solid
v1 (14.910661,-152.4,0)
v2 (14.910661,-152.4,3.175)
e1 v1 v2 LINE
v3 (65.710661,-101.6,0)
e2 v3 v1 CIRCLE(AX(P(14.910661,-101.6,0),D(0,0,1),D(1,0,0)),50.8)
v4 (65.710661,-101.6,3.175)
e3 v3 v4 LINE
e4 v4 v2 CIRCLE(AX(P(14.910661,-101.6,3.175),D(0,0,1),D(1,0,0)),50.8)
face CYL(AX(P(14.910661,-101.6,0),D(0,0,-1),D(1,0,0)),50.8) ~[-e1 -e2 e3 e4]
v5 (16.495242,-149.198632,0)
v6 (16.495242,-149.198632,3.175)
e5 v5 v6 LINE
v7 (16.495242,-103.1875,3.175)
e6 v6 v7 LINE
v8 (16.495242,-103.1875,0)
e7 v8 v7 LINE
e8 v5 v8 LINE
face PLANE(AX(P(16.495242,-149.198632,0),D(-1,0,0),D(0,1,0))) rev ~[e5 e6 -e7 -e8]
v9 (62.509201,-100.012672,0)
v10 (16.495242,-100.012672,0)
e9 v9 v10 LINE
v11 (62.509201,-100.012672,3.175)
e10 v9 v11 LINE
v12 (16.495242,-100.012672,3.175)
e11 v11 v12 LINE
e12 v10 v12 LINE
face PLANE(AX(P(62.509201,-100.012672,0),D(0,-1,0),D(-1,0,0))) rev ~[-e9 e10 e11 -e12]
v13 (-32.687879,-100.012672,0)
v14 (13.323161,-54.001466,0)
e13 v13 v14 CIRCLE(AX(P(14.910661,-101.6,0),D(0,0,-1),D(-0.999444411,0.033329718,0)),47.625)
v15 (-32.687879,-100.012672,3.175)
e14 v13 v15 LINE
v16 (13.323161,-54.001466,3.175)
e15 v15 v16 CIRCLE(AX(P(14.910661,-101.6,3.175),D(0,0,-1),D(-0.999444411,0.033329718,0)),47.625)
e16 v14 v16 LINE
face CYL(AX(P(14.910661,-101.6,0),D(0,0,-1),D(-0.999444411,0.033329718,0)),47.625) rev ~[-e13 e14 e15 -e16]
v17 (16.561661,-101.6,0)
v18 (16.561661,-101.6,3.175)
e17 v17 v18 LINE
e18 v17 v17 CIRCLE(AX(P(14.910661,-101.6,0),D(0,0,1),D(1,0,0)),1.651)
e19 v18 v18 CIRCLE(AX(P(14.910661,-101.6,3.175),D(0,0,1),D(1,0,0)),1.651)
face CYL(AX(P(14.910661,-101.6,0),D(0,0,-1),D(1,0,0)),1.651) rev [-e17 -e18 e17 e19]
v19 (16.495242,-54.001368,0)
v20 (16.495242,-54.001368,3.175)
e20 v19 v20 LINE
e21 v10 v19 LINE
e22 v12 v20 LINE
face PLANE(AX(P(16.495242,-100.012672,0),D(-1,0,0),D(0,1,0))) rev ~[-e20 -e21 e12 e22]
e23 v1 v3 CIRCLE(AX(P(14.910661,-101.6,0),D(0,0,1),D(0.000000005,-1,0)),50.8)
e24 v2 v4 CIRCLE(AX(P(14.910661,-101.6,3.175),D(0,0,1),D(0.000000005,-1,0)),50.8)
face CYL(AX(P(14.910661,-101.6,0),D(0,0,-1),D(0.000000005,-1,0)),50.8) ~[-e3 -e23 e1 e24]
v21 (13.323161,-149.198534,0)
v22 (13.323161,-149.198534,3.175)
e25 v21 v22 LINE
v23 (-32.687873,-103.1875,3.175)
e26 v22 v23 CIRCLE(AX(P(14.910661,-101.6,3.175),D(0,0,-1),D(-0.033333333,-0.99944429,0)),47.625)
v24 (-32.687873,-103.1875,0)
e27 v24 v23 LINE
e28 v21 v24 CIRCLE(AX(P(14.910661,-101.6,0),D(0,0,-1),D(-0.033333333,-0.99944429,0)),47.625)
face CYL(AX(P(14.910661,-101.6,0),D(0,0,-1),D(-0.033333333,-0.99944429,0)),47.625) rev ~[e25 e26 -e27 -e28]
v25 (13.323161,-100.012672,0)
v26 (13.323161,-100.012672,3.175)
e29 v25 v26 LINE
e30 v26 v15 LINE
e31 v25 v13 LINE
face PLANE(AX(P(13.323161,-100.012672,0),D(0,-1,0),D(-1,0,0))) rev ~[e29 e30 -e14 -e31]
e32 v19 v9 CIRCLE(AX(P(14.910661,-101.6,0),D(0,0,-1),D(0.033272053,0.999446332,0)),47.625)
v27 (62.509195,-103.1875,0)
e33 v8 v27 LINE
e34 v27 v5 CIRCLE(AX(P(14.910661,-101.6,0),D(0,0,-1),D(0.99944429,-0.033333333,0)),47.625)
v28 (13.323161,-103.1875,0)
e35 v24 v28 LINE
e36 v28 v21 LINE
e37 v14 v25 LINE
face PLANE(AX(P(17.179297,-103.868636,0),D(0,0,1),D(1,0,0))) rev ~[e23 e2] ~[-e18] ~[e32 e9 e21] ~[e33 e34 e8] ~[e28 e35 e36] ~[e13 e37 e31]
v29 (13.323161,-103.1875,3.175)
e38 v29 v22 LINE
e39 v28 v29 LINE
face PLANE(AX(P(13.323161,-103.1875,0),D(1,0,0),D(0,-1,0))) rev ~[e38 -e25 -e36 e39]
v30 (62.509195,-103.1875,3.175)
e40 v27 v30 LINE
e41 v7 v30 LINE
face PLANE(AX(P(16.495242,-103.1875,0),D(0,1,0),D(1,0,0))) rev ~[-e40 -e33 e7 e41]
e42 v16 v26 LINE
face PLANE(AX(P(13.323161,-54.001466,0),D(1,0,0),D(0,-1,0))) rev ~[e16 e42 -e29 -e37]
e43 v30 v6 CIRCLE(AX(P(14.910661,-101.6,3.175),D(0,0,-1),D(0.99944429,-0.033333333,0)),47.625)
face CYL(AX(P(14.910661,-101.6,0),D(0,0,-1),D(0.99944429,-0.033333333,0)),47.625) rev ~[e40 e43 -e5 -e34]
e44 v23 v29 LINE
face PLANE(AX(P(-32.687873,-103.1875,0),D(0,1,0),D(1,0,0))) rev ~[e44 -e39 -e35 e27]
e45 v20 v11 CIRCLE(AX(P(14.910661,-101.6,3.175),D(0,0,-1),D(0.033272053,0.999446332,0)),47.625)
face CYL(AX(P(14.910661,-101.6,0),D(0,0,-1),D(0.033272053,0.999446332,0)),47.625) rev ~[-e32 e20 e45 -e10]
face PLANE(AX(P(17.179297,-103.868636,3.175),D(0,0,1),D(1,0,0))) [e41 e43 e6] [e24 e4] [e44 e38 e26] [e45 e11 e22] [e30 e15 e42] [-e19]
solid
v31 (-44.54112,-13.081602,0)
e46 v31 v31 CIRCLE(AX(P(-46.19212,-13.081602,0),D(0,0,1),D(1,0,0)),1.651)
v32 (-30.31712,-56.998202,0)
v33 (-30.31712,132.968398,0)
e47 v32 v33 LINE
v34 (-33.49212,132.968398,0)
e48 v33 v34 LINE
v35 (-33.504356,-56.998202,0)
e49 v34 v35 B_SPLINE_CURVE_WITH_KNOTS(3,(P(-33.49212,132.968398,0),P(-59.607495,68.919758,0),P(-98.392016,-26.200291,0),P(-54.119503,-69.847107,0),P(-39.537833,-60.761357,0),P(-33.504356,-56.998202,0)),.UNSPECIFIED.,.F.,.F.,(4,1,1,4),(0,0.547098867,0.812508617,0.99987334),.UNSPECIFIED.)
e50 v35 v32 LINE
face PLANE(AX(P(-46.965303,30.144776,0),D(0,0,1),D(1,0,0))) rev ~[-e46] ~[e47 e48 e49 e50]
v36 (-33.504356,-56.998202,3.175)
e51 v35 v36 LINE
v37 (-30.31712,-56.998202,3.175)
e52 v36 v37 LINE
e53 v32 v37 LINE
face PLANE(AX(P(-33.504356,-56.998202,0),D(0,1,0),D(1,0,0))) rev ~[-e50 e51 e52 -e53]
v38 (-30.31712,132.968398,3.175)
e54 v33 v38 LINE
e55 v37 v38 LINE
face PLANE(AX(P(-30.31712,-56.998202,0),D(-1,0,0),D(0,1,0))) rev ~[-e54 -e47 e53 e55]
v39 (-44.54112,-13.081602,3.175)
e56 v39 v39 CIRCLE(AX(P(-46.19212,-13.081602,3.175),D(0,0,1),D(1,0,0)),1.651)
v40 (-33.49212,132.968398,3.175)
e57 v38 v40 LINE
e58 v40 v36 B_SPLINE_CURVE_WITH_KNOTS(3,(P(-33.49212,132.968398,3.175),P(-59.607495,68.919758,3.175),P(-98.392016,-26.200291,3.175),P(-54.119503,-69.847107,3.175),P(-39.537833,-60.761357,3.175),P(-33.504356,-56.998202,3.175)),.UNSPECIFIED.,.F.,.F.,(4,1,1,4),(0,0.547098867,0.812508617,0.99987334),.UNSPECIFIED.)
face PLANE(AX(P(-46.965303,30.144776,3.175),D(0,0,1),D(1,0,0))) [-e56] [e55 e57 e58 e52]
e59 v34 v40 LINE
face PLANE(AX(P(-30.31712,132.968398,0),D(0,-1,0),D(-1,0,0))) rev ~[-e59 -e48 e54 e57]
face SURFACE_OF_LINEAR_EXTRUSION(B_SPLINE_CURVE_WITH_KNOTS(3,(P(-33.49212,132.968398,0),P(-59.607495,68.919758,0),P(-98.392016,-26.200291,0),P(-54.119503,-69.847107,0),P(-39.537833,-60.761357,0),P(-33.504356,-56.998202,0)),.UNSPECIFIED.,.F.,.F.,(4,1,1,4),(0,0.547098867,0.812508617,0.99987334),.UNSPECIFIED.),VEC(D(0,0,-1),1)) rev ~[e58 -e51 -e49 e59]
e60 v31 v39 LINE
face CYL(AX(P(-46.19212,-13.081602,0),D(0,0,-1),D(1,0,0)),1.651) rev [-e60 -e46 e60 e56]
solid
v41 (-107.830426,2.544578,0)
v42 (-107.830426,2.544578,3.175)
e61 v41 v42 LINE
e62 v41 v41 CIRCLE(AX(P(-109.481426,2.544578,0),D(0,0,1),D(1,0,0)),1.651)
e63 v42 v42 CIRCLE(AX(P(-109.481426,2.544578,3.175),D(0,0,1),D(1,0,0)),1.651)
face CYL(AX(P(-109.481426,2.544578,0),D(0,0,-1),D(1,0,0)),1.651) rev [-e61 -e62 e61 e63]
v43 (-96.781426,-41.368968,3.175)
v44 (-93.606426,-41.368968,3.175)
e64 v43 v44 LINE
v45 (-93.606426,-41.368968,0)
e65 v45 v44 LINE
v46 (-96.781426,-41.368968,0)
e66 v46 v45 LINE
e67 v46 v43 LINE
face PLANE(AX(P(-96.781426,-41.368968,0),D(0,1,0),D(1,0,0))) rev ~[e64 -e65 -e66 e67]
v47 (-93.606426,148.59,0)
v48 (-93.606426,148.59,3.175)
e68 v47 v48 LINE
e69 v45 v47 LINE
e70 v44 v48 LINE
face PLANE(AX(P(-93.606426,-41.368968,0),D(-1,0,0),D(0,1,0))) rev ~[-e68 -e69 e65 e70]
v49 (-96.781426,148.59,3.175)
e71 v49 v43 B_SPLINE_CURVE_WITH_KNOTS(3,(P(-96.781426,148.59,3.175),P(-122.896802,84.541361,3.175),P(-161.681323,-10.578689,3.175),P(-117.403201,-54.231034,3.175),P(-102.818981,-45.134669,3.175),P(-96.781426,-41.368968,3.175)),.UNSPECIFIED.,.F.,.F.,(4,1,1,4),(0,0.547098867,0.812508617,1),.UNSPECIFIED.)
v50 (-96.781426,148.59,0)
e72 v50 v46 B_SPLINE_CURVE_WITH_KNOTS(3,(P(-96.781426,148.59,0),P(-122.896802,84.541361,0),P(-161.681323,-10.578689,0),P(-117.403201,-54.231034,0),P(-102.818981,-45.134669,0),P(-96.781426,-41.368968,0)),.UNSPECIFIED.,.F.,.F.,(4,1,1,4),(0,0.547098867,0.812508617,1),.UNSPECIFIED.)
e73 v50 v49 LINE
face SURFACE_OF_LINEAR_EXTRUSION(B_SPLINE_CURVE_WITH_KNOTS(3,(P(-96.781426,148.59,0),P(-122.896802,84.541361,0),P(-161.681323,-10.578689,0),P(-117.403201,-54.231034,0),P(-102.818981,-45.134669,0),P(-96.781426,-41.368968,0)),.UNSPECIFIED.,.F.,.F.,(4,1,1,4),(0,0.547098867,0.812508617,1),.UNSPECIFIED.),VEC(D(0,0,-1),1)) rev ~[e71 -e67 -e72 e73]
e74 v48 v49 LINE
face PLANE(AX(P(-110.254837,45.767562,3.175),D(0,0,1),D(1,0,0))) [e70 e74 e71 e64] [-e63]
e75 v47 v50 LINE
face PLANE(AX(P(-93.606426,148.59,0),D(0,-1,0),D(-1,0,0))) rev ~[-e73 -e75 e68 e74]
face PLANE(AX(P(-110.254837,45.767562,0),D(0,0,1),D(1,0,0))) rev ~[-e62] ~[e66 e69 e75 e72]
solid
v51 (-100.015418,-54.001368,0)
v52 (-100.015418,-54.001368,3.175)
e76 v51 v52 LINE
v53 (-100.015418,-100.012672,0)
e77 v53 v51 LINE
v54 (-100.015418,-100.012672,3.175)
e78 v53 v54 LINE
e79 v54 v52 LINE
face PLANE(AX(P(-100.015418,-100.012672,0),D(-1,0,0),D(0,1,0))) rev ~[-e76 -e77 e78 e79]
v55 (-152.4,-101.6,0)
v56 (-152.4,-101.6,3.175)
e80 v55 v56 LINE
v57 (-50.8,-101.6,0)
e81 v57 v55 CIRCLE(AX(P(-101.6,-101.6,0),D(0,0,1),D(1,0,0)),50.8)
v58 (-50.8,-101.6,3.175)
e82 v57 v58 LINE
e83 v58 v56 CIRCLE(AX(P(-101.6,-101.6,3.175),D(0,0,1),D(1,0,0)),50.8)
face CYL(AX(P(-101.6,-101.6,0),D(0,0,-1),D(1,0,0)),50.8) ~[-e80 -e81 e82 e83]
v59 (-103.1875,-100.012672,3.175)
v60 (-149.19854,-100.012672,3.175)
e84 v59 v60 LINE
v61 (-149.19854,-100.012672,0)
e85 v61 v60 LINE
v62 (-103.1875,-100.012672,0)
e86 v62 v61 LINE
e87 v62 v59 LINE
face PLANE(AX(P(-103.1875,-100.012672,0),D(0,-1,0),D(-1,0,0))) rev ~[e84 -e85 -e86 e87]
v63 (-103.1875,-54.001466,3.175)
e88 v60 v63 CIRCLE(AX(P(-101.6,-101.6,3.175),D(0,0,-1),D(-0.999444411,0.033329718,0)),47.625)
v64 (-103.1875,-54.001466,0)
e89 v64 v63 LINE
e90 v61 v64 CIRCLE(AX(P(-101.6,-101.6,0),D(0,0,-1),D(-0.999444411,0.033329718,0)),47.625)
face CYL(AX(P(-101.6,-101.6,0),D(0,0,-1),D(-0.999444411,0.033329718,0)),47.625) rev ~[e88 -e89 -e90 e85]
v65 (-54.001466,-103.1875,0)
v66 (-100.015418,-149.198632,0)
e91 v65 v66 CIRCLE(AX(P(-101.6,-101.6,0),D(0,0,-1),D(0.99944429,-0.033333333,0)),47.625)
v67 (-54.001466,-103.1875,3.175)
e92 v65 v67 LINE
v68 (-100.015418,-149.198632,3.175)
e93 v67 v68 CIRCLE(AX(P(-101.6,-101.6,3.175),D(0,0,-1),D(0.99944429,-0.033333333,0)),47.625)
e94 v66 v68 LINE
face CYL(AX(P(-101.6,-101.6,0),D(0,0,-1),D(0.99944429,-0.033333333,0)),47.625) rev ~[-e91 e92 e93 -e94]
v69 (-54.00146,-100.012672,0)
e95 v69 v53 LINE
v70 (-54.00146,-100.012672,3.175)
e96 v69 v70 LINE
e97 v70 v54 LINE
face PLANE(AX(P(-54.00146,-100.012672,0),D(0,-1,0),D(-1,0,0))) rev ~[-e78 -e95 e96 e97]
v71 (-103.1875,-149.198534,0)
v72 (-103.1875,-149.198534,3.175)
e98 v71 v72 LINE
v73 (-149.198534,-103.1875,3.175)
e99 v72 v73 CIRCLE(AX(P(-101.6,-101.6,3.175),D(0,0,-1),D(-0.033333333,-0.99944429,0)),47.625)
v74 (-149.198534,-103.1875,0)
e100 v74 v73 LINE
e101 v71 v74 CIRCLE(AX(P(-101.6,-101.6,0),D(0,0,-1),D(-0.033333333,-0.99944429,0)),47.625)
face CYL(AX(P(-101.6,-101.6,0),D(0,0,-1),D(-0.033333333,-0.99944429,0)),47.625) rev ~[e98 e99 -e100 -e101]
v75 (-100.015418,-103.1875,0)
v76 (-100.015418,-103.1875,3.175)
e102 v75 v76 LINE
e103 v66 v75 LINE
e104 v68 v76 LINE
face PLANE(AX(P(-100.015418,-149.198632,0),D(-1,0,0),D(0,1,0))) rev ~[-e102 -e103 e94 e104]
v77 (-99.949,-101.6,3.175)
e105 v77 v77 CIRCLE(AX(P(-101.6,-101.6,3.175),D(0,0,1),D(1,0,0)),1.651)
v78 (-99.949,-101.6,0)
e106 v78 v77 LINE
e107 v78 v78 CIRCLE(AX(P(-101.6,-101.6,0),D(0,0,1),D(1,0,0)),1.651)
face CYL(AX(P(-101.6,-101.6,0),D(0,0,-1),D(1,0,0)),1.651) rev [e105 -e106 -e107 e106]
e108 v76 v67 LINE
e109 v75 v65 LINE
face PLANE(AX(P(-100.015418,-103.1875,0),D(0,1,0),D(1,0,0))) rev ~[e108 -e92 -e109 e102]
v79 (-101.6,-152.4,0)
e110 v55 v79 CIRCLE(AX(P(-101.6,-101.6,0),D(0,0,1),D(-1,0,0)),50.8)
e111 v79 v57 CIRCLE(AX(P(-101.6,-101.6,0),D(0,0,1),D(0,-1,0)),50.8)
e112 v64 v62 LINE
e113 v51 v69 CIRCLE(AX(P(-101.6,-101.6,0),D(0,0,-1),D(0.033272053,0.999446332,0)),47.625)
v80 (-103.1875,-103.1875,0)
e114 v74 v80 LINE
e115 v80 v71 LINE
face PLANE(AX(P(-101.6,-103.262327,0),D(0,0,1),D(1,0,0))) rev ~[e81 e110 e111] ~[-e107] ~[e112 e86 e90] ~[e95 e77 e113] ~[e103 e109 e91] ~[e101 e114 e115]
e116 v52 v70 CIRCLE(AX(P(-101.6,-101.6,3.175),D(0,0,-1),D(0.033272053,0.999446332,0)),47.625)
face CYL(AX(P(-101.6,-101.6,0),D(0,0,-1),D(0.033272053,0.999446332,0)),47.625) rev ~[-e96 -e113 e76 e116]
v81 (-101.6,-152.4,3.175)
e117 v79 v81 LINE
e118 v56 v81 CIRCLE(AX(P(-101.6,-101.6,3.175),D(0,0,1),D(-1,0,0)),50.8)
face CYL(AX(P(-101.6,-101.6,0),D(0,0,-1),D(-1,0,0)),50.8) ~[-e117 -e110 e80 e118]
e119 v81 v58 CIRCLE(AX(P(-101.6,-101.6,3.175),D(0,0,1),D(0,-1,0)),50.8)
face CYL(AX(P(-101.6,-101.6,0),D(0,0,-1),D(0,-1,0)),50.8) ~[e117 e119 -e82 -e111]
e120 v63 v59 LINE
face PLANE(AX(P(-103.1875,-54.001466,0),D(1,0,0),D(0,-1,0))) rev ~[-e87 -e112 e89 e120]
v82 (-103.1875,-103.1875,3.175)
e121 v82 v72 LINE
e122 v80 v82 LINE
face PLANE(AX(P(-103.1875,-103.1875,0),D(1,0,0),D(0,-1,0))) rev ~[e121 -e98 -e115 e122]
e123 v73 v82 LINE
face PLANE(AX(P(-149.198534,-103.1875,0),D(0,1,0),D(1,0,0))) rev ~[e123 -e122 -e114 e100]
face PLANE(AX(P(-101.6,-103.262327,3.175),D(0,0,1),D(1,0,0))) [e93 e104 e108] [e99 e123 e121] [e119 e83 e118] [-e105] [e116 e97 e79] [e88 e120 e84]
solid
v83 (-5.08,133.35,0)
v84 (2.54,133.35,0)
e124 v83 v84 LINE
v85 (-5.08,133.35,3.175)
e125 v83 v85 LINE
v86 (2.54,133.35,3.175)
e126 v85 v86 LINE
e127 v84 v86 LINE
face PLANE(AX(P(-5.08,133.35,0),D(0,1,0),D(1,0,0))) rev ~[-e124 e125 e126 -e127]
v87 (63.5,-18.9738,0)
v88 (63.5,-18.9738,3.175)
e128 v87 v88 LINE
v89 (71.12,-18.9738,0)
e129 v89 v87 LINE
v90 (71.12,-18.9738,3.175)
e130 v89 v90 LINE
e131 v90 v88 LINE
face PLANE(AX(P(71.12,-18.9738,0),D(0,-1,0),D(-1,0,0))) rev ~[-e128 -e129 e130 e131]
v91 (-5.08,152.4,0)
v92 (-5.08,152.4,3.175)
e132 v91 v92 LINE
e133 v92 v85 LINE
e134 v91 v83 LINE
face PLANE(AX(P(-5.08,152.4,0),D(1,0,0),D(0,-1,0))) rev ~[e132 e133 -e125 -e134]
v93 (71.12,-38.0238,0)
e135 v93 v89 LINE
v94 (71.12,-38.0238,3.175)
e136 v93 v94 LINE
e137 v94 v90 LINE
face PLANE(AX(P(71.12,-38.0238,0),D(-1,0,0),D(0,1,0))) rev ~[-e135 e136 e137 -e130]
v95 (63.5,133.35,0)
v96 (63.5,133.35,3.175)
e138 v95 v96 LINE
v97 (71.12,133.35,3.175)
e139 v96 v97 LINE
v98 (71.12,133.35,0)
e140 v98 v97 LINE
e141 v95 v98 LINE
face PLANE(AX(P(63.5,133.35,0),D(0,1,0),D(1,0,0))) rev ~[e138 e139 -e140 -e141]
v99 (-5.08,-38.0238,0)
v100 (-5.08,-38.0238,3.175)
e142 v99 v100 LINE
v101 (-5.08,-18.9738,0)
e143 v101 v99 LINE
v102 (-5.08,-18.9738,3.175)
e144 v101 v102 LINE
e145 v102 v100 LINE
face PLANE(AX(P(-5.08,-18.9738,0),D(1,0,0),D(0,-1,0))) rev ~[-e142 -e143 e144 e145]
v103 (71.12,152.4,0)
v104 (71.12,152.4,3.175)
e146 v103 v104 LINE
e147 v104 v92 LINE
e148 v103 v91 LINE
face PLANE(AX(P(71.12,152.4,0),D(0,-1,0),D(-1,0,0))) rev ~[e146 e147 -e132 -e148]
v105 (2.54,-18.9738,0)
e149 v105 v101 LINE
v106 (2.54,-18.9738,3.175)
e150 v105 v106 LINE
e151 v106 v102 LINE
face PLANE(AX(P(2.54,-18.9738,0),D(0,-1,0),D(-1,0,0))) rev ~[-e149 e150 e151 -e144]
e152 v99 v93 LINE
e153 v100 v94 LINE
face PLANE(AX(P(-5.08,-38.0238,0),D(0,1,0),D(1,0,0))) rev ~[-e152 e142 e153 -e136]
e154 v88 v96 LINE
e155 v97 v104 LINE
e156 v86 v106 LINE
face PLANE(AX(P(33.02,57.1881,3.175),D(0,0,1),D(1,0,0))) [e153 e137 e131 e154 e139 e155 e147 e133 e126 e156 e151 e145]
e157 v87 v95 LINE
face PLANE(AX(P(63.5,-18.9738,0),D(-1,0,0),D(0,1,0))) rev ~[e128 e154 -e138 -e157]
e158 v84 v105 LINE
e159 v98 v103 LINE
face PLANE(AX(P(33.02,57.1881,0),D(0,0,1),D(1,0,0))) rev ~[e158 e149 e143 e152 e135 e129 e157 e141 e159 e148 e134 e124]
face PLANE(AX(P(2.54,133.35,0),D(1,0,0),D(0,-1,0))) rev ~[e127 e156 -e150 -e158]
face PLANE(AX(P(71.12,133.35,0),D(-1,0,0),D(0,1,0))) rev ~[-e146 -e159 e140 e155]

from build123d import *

# Parameters (mm, degrees)
F0_R     = 1.651
F1_DEPTH = 3.175


# Not quite as in the source:
# - a feature names something its author has since deleted; it is built from what else it names


with BuildPart() as f1:
    # F0 (on Top) → F1 (new body)
    with BuildSketch(Plane.XY):
        with BuildLine():
            ThreePointArc((65.7106608197, -101.6), (-21.0103637537, -65.6789756049), (14.9106610719, -152.4))
            ThreePointArc((14.9106610719, -152.4), (50.8316853932, -137.5210243951), (65.7106608197, -101.6))
        make_face()
        with BuildLine():
            Line((-32.6878734933, -103.1875), (13.3231608197, -103.1875))
            Line((13.3231608197, -103.1875), (13.3231608197, -149.198534313))
            ThreePointArc((13.3231608197, -149.198534313), (-18.7652996343, -135.275960454), (-32.6878734933, -103.1875))
        make_face(mode=Mode.SUBTRACT)
        with BuildLine():
            Line((13.3231608197, -54.001465687), (13.3231608197, -100.0126722037))
            Line((13.3231608197, -100.0126722037), (-32.6878792363, -100.0126722037))
            ThreePointArc((-32.6878792363, -100.0126722037), (-18.7653605513, -67.9241004631), (13.3231608197, -54.001465687))
        make_face(mode=Mode.SUBTRACT)
        with BuildLine():
            ThreePointArc((62.5091951328, -103.1875), (48.5855888423, -135.2769928537), (16.4952423273, -149.1986315606))
            Line((16.4952423273, -149.1986315606), (16.4952423273, -103.1875))
            Line((16.4952423273, -103.1875), (62.5091951328, -103.1875))
        make_face(mode=Mode.SUBTRACT)
        with Locations((14.9106608197, -101.6)):
            Circle(F0_R, mode=Mode.SUBTRACT)
        with BuildLine():
            Line((16.4952423273, -100.0126722037), (16.4952423273, -54.0013684394))
            ThreePointArc((16.4952423273, -54.0013684394), (48.5856497612, -67.9230680615), (62.5092008758, -100.0126722037))
            Line((62.5092008758, -100.0126722037), (16.4952423273, -100.0126722037))
        make_face(mode=Mode.SUBTRACT)
    extrude(amount=F1_DEPTH)


with BuildPart() as f1b:
    # F0 (on Top) → F1, piece 2 (new body)
    with BuildSketch(Plane.XY):
        with BuildLine():
            ThreePointArc((-152.4, -101.6), (-137.5210244843, -137.5210244843), (-101.6, -152.4))
            ThreePointArc((-101.6, -152.4), (-65.6789755157, -137.5210244843), (-50.8, -101.6))
            ThreePointArc((-50.8, -101.6), (-101.6, -50.8), (-152.4, -101.6))
        make_face()
        with BuildLine():
            Line((-149.198534313, -103.1875), (-103.1875, -103.1875))
            Line((-103.1875, -103.1875), (-103.1875, -149.198534313))
            ThreePointArc((-103.1875, -149.198534313), (-135.275960454, -135.275960454), (-149.198534313, -103.1875))
        make_face(mode=Mode.SUBTRACT)
        with BuildLine():
            Line((-103.1875, -54.001465687), (-103.1875, -100.0126722037))
            Line((-103.1875, -100.0126722037), (-149.198540056, -100.0126722037))
            ThreePointArc((-149.198540056, -100.0126722037), (-135.276021371, -67.9241004631), (-103.1875, -54.001465687))
        make_face(mode=Mode.SUBTRACT)
        with Locations((-101.6, -101.6)):
            Circle(F0_R, mode=Mode.SUBTRACT)
        with BuildLine():
            ThreePointArc((-54.001465687, -103.1875), (-67.9250719774, -135.2769928537), (-100.0154184924, -149.1986315606))
            Line((-100.0154184924, -149.1986315606), (-100.0154184924, -103.1875))
            Line((-100.0154184924, -103.1875), (-54.001465687, -103.1875))
        make_face(mode=Mode.SUBTRACT)
        with BuildLine():
            Line((-100.0154184924, -100.0126722037), (-100.0154184924, -54.0013684394))
            ThreePointArc((-100.0154184924, -54.0013684394), (-67.9250110585, -67.9230680615), (-54.001459944, -100.0126722037))
            Line((-54.001459944, -100.0126722037), (-100.0154184924, -100.0126722037))
        make_face(mode=Mode.SUBTRACT)
    extrude(amount=F1_DEPTH)


with BuildPart() as f1c:
    # F0 (on Top) → F1, piece 3 (new body)
    with BuildSketch(Plane.XY):
        Polygon((71.12, 133.35), (71.12, 152.4), (-5.08, 152.4), (-5.08, 133.35), (2.54, 133.35), (2.54, -18.9738), (-5.08, -18.9738), (-5.08, -38.0238), (71.12, -38.0238), (71.12, -18.9738), (63.5, -18.9738), (63.5, 133.35), align=None)
    extrude(amount=F1_DEPTH)


with BuildPart() as f1d:
    # F0 (on Top) → F1, piece 4 (new body)
    with BuildSketch(Plane.XY):
        with BuildLine():
            Line((-93.6064264297, 148.5900000185), (-96.7814264297, 148.5900000185))
            add(Edge.make_bspline(
                [(-96.7814264297, 148.5900000185), (-122.8968017051, 84.5413605912), (-161.6813226062, -10.5786891249), (-117.4032009161, -54.2310342357), (-102.8189814093, -45.1346689408), (-96.7814264297, -41.3689682424)],
                knots=[0, 0, 0, 0, 0.5470988668, 0.8125086166, 1, 1, 1, 1], degree=3))
            Line((-96.7814264297, -41.3689682424), (-93.6064264297, -41.3689682424))
            Line((-93.6064264297, -41.3689682424), (-93.6064264297, 148.5900000185))
        make_face()
        with Locations((-109.4814264297, 2.5445778297)):
            Circle(F0_R, mode=Mode.SUBTRACT)
    extrude(amount=F1_DEPTH)


with BuildPart() as f1e:
    # F0 (on Top) → F1, piece 5 (new body)
    with BuildSketch(Plane.XY):
        with BuildLine():
            Line((-30.3171201937, 132.9683979097), (-33.4921201937, 132.9683979097))
            add(Edge.make_bspline(
                [(-33.4921201937, 132.9683979097), (-59.6074954691, 68.9197584825), (-98.3920163702, -26.2002912337), (-54.1195029261, -69.8471073591), (-39.5378329238, -60.761356619), (-33.504356178, -56.9982020903)],
                knots=[0, 0, 0, 0, 0.5470988668, 0.8125086166, 0.9998733405, 0.9998733405, 0.9998733405, 0.9998733405], degree=3))
            Line((-33.504356178, -56.9982020903), (-30.3171201937, -56.9982020903))
            Line((-30.3171201937, -56.9982020903), (-30.3171201937, 132.9683979097))
        make_face()
        with Locations((-46.1921201937, -13.0816020903)):
            Circle(F0_R, mode=Mode.SUBTRACT)
    extrude(amount=F1_DEPTH)


solid = Compound([f1.part, f1b.part, f1c.part, f1d.part, f1e.part])
